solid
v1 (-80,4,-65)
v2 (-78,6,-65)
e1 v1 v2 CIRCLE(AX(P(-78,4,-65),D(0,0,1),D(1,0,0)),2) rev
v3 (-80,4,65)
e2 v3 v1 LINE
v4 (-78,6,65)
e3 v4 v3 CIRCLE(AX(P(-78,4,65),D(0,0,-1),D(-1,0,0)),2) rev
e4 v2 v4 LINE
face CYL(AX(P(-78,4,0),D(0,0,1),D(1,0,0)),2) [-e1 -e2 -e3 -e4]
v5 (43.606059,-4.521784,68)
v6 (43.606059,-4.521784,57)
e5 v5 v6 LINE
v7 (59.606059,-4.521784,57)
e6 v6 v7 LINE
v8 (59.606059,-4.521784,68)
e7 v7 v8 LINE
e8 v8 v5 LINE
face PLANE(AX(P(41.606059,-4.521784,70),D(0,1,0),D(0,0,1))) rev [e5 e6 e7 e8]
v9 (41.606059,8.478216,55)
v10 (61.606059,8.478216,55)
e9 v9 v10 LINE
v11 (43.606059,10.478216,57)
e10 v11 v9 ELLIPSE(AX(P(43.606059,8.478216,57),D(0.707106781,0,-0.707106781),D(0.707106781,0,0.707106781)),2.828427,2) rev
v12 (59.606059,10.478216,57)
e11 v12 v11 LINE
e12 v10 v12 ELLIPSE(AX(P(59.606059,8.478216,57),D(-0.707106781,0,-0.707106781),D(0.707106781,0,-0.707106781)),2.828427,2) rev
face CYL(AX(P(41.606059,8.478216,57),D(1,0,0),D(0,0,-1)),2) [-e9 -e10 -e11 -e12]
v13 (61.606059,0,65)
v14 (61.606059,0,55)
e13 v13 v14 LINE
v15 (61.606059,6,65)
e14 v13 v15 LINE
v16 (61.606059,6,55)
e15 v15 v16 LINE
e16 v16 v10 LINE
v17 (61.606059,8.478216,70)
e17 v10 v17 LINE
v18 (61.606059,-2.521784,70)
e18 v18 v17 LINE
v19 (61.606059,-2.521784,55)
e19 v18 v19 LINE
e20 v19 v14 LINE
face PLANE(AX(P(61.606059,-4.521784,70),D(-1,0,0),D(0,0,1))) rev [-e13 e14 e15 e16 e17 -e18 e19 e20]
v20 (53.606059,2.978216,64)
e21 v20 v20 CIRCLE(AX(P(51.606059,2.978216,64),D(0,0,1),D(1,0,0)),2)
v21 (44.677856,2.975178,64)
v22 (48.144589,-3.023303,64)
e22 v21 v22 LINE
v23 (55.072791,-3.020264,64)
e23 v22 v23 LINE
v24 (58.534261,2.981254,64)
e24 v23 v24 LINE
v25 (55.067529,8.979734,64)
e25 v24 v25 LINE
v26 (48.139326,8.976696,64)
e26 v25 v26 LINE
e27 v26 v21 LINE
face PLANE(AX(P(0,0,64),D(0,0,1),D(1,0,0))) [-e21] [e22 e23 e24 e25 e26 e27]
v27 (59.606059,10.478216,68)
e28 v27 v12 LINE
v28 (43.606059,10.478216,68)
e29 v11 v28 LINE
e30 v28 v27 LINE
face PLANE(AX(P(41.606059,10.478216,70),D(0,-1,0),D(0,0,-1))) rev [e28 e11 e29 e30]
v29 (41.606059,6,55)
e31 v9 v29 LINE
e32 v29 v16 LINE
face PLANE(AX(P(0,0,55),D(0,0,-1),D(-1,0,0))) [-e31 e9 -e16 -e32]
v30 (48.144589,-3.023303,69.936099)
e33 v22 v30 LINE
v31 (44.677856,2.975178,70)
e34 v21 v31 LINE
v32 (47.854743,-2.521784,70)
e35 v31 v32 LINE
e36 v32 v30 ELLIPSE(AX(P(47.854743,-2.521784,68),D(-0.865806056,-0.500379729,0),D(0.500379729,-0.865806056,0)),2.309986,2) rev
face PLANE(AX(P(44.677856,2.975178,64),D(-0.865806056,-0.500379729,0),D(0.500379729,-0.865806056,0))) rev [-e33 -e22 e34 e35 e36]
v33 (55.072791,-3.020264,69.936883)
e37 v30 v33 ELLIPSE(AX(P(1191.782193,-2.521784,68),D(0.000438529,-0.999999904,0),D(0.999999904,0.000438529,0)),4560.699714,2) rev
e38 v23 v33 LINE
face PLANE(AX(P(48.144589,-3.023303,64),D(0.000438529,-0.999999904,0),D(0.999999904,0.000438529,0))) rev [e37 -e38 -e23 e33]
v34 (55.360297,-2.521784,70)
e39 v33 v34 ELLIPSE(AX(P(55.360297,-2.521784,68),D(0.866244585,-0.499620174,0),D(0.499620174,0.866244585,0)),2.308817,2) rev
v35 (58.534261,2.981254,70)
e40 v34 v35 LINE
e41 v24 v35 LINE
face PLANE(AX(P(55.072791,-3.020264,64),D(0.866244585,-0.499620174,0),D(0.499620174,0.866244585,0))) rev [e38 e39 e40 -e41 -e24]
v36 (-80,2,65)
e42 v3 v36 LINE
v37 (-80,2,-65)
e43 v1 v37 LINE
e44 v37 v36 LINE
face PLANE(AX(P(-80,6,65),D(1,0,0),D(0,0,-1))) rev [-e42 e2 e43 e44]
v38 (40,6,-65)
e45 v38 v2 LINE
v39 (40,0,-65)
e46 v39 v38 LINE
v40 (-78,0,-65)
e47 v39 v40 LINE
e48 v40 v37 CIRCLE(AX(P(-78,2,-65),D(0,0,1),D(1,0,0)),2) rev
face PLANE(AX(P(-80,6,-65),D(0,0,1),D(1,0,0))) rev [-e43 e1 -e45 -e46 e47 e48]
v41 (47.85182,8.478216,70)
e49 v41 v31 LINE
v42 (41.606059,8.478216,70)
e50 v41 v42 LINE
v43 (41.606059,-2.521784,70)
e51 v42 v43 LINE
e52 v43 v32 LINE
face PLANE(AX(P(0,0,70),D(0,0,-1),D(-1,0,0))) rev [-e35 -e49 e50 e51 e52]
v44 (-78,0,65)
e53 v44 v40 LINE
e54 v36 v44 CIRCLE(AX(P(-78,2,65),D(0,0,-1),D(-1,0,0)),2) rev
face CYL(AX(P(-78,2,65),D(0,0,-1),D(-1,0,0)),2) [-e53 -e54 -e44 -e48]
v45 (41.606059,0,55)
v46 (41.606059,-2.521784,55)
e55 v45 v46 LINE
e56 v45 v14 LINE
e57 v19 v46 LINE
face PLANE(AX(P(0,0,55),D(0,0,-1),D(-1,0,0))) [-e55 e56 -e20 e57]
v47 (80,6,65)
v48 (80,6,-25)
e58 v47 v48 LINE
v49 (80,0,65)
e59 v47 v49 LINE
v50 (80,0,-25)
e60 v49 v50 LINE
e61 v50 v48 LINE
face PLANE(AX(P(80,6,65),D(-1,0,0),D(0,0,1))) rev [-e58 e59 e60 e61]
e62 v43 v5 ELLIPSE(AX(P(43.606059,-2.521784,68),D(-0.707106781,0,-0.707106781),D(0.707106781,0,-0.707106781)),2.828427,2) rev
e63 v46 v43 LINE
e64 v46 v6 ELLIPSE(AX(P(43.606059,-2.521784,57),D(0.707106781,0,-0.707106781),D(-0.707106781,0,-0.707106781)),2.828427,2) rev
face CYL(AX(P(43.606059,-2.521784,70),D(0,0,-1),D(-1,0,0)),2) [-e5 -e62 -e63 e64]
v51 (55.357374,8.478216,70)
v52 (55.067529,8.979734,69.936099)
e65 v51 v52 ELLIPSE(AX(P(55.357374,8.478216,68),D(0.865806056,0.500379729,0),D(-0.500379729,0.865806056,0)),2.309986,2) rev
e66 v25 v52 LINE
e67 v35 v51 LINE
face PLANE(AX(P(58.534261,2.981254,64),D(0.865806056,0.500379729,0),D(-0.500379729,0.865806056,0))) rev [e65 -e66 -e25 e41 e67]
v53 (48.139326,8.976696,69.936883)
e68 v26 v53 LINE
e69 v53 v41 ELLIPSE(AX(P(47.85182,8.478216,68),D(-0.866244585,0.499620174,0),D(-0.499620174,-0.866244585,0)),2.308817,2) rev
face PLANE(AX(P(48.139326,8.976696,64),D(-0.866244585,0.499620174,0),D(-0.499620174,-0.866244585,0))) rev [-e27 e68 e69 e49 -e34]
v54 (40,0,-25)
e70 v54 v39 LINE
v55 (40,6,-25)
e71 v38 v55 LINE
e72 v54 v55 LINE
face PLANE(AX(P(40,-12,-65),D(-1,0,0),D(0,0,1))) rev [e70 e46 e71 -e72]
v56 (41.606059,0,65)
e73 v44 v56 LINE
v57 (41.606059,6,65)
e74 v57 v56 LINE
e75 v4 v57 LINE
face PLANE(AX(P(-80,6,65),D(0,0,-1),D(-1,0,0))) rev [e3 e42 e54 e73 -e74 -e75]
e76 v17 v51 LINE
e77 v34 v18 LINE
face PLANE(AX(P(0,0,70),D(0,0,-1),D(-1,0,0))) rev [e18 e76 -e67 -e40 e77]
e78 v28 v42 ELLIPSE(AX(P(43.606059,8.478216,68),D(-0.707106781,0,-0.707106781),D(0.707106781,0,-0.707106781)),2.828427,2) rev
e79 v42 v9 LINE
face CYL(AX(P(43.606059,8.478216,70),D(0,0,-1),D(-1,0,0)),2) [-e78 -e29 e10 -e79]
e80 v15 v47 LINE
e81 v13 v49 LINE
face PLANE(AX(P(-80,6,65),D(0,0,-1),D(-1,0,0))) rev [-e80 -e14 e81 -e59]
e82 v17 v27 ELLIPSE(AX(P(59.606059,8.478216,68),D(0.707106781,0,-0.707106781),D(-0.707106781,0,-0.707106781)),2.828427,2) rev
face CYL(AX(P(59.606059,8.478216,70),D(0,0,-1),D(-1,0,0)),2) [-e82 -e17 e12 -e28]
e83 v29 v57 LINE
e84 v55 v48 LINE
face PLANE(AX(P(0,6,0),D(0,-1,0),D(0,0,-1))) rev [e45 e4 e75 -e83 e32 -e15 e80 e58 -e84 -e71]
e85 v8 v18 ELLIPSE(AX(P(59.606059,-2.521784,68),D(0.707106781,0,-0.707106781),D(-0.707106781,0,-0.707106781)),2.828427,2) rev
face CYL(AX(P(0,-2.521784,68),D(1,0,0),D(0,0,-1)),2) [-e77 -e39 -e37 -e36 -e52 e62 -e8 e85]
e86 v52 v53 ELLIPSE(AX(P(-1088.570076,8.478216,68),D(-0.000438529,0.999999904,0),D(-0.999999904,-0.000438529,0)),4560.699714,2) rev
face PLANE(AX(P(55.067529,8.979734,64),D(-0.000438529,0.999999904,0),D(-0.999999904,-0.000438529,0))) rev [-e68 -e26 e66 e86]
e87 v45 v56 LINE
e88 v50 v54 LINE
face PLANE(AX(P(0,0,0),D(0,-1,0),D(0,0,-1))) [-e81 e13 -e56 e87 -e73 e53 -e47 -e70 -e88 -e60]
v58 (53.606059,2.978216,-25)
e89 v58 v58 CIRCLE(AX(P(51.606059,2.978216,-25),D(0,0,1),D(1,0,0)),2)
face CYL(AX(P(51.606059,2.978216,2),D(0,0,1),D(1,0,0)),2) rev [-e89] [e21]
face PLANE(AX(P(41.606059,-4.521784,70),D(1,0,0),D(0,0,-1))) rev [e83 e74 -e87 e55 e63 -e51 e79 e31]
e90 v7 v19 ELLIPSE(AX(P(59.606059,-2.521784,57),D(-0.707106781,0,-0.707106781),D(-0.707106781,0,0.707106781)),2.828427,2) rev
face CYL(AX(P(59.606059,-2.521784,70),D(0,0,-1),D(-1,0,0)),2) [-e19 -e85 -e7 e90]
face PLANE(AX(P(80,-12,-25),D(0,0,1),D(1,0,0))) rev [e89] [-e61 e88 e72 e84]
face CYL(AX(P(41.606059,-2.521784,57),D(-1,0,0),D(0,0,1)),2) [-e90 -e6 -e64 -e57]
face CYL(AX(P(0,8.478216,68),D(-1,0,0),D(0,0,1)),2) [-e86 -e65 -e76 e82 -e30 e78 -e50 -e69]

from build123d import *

# Parameters (mm, degrees)
SKETCH2_W                = 160
SKETCH2_H                = 130
BOSS_EXTRUDE1_DEPTH      = 6
SKETCH7_W                = 40
SKETCH7_H                = 40
CUT_EXTRUDE1_DEPTH       = 18
SKETCH9_R                = 2
CUT_EXTRUDE2_DEPTH       = 63
BOSS_EXTRUDE2_DEPTH      = 5
BOSS_EXTRUDE2_DEPTH_BACK = 10
SKETCH11_W               = 20
SKETCH11_H               = 15
CUT_EXTRUDE4_DEPTH       = 6
SKETCH13_R               = 2
CUT_EXTRUDE5_DEPTH       = 222
FILLET4_R                = 2
FILLET5_R                = 2
FILLET6_R                = 2


with BuildPart() as part:
    # Sketch2 → Boss-Extrude1 (new body)
    with BuildSketch(Plane(origin=(0, 0, 0), x_dir=(1, 0, 0), z_dir=(0, 1, 0))):
        Rectangle(SKETCH2_W, SKETCH2_H)
    extrude(amount=BOSS_EXTRUDE1_DEPTH)

    # Sketch7 → Cut-Extrude1 (cut)
    with BuildSketch(Plane(origin=(0, 6, 0), x_dir=(1, 0, 0), z_dir=(0, 1, 0))):
        with Locations((60, 45)):
            Rectangle(SKETCH7_W, SKETCH7_H)
    extrude(amount=-CUT_EXTRUDE1_DEPTH, mode=Mode.SUBTRACT)

    # Sketch9 → Cut-Extrude2 (cut)
    with BuildSketch(Plane.XY.offset(65)):
        with Locations((51.606058682, 2.978215898)):
            Circle(SKETCH9_R)
    extrude(amount=-CUT_EXTRUDE2_DEPTH, mode=Mode.SUBTRACT)

    # Sketch11 → Boss-Extrude2 (add, two sides: drawn at the far end of the back side and taken through both)
    with BuildSketch(Plane.XY.offset(65).offset(-BOSS_EXTRUDE2_DEPTH_BACK)):
        with Locations((51.606058682, 2.978215898)):
            Rectangle(SKETCH11_W, SKETCH11_H)
    extrude(amount=BOSS_EXTRUDE2_DEPTH + BOSS_EXTRUDE2_DEPTH_BACK)

    # Sketch12 → Cut-Extrude4 (cut)
    with BuildSketch(Plane.XY.offset(70)):
        Polygon((55.07279114, -3.020264415), (58.534261247, 2.981254118), (55.067528789, 8.979734431), (48.139326225, 8.976696212), (44.677856118, 2.975177679), (48.144588576, -3.023302634), align=None)
    extrude(amount=-CUT_EXTRUDE4_DEPTH, mode=Mode.SUBTRACT)

    # Sketch13 → Cut-Extrude5 (cut)
    with BuildSketch(Plane.XY.offset(64)):
        with Locations((51.606058682, 2.978215898)):
            Circle(SKETCH13_R)
    extrude(amount=-CUT_EXTRUDE5_DEPTH, mode=Mode.SUBTRACT)

    # Fillet4
    fillet4_edges = [part.edges().sort_by_distance(p)[0] for p in [
        (-80, 6, 0),
        (-80, 0, 0),
    ]]
    fillet(fillet4_edges, radius=FILLET4_R)

    # Fillet5
    # the kernel refuses this fillet: 2 mm, written as the material it takes off along each edge
    with BuildSketch(Plane(origin=(36.606058682, -4.521784102, 70), x_dir=(0, 0, -1), z_dir=(1, 0, 0)), Plane(origin=(36.606058682, -4.521784102, 55), x_dir=(0, 1, 0), z_dir=(1, 0, 0))) as fillet5_piece_1:
        with BuildLine():
            CenterArc((FILLET5_R, FILLET5_R), FILLET5_R, 180, 90)
            Line((0, FILLET5_R), (0, 0))
            Line((0, 0), (FILLET5_R, 0))
        make_face()
    extrude(amount=30, mode=Mode.SUBTRACT)
    with BuildSketch(Plane(origin=(61.606058682, -4.521784102, 50), x_dir=(0, 1, 0), z_dir=(0, 0, 1)), Plane(origin=(41.606058682, -4.521784102, 75), x_dir=(0, 1, 0), z_dir=(0, 0, -1))) as fillet5_piece_2:
        with BuildLine():
            CenterArc((FILLET5_R, FILLET5_R), FILLET5_R, 180, 90)
            Line((0, FILLET5_R), (0, 0))
            Line((0, 0), (FILLET5_R, 0))
        make_face()
    extrude(amount=25, mode=Mode.SUBTRACT)

    # Fillet6
    # the kernel refuses this fillet: 2 mm, written as the material it takes off along each edge
    with BuildSketch(Plane(origin=(66.606058682, 10.478215898, 70), x_dir=(0, 0, -1), z_dir=(-1, 0, 0))) as fillet6_piece_1:
        with BuildLine():
            CenterArc((FILLET6_R, FILLET6_R), FILLET6_R, 180, 90)
            Line((0, FILLET6_R), (0, 0))
            Line((0, 0), (FILLET6_R, 0))
        make_face()
    extrude(amount=30, mode=Mode.SUBTRACT)
    with BuildSketch(Plane(origin=(41.606058682, 10.478215898, 75), x_dir=(0, -1, 0), z_dir=(0, 0, -1)), Plane(origin=(61.606058682, 10.478215898, 50), x_dir=(0, -1, 0), z_dir=(0, 0, 1))) as fillet6_piece_2:
        with BuildLine():
            CenterArc((FILLET6_R, -FILLET6_R), FILLET6_R, 90, 90)
            Line((0, -FILLET6_R), (0, 0))
            Line((0, 0), (FILLET6_R, 0))
        make_face()
    extrude(amount=25, mode=Mode.SUBTRACT)
    with BuildSketch(Plane(origin=(66.606058682, 10.478215898, 55), x_dir=(0, 0, 1), z_dir=(-1, 0, 0))) as fillet6_piece_3:
        with BuildLine():
            CenterArc((FILLET6_R, -FILLET6_R), FILLET6_R, 90, 90)
            Line((0, -FILLET6_R), (0, 0))
            Line((0, 0), (FILLET6_R, 0))
        make_face()
    extrude(amount=30, mode=Mode.SUBTRACT)


solid = part.part
